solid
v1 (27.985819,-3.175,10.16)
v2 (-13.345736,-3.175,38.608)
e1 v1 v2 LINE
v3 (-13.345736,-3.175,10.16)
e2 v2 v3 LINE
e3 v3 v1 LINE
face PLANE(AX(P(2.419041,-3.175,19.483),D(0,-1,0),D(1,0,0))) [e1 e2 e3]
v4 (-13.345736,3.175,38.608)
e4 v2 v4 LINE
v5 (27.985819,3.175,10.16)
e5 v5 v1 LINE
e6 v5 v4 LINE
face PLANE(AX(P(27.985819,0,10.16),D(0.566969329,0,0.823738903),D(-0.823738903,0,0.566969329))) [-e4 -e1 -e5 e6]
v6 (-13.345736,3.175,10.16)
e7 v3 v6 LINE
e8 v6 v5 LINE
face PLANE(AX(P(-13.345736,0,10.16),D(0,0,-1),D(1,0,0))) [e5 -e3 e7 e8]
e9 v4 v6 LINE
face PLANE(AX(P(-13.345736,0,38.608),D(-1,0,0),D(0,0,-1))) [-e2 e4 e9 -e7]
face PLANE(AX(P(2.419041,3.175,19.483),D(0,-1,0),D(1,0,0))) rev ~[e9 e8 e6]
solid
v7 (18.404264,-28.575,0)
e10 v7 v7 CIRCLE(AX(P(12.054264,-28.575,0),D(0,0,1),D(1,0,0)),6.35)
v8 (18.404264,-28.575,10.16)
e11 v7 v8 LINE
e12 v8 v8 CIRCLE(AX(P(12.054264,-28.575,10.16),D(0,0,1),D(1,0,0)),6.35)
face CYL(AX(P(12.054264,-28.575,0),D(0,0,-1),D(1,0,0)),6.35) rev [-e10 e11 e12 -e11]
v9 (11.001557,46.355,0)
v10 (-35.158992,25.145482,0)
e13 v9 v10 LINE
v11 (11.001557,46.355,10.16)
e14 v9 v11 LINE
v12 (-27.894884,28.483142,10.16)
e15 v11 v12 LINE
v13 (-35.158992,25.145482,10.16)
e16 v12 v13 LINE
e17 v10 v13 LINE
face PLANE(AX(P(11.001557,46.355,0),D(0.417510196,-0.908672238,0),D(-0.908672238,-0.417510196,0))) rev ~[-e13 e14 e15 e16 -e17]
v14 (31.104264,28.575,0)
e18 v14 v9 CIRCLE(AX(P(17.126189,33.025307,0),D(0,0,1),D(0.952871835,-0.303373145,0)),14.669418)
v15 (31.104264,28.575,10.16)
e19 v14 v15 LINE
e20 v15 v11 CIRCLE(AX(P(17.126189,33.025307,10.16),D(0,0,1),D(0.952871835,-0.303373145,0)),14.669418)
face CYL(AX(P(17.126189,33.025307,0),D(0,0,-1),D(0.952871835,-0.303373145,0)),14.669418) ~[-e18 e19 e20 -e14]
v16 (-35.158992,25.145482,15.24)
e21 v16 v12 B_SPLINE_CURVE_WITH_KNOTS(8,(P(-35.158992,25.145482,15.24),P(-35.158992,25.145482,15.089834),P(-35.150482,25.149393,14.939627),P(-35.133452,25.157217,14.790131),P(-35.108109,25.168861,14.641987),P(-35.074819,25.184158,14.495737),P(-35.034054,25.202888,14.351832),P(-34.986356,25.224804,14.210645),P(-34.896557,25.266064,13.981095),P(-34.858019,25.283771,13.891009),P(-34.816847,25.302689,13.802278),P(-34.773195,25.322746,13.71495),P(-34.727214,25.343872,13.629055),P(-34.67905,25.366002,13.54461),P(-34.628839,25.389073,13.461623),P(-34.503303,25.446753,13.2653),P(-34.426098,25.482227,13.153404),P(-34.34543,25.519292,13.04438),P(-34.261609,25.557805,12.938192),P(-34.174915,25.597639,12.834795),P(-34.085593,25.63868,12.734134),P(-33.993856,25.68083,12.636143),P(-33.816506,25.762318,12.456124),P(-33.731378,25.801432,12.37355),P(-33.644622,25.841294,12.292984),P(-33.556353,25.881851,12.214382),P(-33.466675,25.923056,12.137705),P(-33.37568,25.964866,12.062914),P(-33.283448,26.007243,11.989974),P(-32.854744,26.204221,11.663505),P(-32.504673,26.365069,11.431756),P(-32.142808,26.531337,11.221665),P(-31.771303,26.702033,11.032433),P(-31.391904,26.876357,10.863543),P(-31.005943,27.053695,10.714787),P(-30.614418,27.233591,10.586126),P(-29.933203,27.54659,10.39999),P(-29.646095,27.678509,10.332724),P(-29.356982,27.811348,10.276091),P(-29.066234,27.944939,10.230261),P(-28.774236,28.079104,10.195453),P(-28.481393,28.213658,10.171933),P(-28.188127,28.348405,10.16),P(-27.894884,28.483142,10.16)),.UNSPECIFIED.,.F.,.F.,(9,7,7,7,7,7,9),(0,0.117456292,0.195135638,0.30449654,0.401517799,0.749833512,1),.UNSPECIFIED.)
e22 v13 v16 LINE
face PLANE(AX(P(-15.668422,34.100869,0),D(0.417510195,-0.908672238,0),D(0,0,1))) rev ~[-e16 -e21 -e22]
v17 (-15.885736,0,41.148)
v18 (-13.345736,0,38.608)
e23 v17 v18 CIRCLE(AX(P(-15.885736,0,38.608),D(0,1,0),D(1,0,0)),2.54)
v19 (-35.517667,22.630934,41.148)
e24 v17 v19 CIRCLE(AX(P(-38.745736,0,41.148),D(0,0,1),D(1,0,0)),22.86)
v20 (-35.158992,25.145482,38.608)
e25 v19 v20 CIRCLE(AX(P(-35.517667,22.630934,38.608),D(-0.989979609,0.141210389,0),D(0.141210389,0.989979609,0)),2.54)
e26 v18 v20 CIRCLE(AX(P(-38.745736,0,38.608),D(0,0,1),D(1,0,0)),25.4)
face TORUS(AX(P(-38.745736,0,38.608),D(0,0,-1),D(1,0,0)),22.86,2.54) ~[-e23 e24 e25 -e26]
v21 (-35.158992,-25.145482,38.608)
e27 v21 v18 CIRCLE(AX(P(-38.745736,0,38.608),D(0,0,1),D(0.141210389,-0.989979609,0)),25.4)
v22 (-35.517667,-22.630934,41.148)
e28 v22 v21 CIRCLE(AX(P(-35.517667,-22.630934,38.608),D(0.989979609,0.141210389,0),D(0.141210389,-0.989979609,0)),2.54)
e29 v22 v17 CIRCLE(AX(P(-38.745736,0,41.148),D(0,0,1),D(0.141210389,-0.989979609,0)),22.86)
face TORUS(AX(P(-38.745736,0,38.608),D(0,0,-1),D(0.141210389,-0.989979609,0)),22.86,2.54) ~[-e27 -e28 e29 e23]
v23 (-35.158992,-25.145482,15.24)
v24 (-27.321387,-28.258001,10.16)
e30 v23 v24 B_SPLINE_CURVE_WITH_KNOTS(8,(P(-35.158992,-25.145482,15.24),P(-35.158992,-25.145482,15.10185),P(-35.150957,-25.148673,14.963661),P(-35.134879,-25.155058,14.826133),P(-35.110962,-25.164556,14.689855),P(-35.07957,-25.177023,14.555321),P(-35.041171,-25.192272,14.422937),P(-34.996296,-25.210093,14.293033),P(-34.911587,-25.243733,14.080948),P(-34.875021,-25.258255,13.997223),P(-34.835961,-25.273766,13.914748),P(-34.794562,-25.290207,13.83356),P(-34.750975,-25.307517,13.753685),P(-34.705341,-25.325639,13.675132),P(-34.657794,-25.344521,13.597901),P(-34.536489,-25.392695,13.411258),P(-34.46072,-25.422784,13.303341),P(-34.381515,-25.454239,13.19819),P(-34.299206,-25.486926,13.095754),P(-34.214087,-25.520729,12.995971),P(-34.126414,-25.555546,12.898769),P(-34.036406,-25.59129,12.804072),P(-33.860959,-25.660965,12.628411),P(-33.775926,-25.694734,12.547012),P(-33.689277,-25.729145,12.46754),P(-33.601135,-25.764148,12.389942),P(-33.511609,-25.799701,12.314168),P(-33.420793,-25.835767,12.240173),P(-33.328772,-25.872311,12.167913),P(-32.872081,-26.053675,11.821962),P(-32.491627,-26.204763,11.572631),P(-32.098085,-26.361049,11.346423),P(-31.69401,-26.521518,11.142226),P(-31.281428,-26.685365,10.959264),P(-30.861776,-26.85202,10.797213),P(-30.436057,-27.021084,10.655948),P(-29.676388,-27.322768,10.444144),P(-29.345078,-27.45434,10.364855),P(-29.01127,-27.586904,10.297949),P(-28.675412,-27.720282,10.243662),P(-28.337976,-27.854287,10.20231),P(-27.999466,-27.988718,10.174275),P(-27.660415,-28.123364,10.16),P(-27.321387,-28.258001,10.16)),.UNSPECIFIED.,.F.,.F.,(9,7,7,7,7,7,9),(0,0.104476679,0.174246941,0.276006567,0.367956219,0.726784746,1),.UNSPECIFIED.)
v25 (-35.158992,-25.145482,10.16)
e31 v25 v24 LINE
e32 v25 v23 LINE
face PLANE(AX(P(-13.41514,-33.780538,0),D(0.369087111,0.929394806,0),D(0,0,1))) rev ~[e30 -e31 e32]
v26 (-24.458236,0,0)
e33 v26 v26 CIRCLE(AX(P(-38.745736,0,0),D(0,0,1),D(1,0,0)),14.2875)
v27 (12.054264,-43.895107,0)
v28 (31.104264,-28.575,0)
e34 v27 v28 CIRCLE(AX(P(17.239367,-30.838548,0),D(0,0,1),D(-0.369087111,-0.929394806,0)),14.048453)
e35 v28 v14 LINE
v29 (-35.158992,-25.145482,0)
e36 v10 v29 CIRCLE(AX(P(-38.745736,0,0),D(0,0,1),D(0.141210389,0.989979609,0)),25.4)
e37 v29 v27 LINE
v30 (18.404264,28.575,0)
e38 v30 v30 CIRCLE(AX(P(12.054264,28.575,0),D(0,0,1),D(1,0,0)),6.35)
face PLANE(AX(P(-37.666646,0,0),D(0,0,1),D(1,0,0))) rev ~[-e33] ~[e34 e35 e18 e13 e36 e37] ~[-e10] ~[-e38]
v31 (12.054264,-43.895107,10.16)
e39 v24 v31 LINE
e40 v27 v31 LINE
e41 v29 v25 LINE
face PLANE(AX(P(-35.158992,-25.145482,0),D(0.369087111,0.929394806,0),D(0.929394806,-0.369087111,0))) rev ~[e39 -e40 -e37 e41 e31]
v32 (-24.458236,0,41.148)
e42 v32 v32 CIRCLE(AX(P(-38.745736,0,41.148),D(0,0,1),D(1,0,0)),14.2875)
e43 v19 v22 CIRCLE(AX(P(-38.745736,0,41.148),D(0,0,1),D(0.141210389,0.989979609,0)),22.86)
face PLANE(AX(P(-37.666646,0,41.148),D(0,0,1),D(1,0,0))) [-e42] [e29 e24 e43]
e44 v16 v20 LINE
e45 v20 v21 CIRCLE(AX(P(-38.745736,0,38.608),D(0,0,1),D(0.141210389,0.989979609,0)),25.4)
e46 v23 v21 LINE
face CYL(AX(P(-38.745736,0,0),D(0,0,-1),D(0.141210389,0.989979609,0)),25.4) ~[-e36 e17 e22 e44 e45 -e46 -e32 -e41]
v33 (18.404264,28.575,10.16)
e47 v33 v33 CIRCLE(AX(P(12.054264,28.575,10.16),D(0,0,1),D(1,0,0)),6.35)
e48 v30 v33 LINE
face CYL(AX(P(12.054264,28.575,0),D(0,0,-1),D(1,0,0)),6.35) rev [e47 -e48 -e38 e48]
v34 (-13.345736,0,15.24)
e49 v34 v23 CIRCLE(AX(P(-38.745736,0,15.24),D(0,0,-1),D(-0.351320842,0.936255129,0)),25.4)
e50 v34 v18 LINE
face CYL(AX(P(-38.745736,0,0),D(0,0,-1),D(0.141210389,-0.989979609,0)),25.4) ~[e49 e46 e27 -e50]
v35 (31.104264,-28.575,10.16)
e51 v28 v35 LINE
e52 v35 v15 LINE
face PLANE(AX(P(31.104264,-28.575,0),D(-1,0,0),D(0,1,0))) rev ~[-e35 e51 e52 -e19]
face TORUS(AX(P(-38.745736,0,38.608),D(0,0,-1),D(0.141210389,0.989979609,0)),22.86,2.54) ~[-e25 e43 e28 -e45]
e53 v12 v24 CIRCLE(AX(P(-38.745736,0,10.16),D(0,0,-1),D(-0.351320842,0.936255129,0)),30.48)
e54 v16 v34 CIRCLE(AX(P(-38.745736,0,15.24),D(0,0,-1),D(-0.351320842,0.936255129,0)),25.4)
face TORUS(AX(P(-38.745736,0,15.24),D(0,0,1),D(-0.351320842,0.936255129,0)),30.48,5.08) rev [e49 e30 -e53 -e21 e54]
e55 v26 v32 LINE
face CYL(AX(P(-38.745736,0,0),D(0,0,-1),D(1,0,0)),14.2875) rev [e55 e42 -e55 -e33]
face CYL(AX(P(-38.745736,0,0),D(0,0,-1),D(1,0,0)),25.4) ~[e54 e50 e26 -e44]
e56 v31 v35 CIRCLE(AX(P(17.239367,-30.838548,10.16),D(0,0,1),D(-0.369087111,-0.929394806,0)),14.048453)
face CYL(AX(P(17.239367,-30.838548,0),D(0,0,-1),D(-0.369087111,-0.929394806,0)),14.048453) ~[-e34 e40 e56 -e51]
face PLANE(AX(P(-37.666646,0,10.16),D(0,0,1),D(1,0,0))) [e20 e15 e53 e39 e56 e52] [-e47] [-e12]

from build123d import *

# Parameters (mm, degrees)
F0_R          = 14.2875
F2_DEPTH      = 41.148
F0_R_2        = 6.35
F3_DEPTH      = 10.16
F4_R          = 2.54
F6_DEPTH      = 3.175
F6_DEPTH_BACK = 3.175
F7_T4_ANGLE   = 221.1362500102


# Not quite as in the source:
# - a fillet or chamfer that OpenCascade refuses, or shapes differently, is made with other operations: its cross-section is extruded or revolved along the edge and cut away or added


with BuildPart() as f2:
    # F0 (on Top) → F2 (new body)
    with BuildSketch(Plane.XY):
        with BuildLine():
            ThreePointArc((-35.158992291, -25.1454820671), (-19.5589790857, -16.6441687329), (-13.3457361643, 0))
            ThreePointArc((-13.3457361643, 0), (-19.5589790857, 16.6441687329), (-35.158992291, 25.1454820671))
            ThreePointArc((-35.158992291, 25.1454820671), (-64.1457361643, 0), (-35.158992291, -25.1454820671))
        make_face()
        with Locations((-38.7457361643, 0)):
            Circle(F0_R, mode=Mode.SUBTRACT)
    extrude(amount=F2_DEPTH)

    # F0 (on Top) → F3 (join)
    with BuildSketch(Plane.XY):
        with BuildLine():
            ThreePointArc((-35.158992291, -25.1454820671), (-19.5589790857, -16.6441687329), (-13.3457361643, 0))
            ThreePointArc((-13.3457361643, 0), (-19.5589790857, 16.6441687329), (-35.158992291, 25.1454820671))
            ThreePointArc((-35.158992291, 25.1454820671), (-64.1457361643, 0), (-35.158992291, -25.1454820671))
        make_face()
        with Locations((-38.7457361643, 0)):
            Circle(F0_R, mode=Mode.SUBTRACT)
        with BuildLine():
            ThreePointArc((-35.158992291, 25.1454820671), (-19.5589790857, 16.6441687329), (-13.3457361643, 0))
            ThreePointArc((-13.3457361643, 0), (-19.5589790857, -16.6441687329), (-35.158992291, -25.1454820671))
            Line((-35.158992291, -25.1454820671), (12.0542638357, -43.8951072877))
            ThreePointArc((12.0542638357, -43.8951072877), (26.0434071743, -41.786054626), (31.1042638357, -28.575))
            Line((31.1042638357, -28.575), (31.1042638357, 28.575))
            ThreePointArc((31.1042638357, 28.575), (26.8447918404, 44.0135088699), (11.0015574139, 46.355))
            Line((11.0015574139, 46.355), (-35.158992291, 25.1454820671))
        make_face()
        with Locations((12.0542638357, -28.575)):
            Circle(F0_R_2, mode=Mode.SUBTRACT)
        with Locations((12.0542638357, 28.575)):
            Circle(F0_R_2, mode=Mode.SUBTRACT)
    extrude(amount=F3_DEPTH)

    # F4
    f4_edges = [f2.edges().sort_by_distance(p)[0] for p in [
        (-42.33248, 25.145482, 41.148),
    ]]
    fillet(f4_edges, radius=F4_R)

    # F7: fillet of radius 5.08 on 1 edges, made by hand


with BuildPart() as f6:
    # F5 (on Front) → F6 (new body, two sides)
    with BuildSketch(Plane.XZ) as f6_sk:
        Polygon((-13.3457361643, 10.16), (11.0015574139, 10.16), (12.0542638357, 10.16), (27.9858194052, 10.16), (-13.3457361643, 38.608), align=None)
    extrude(amount=F6_DEPTH)
    extrude(f6_sk.sketch, amount=-F6_DEPTH_BACK)


with BuildPart() as f7_tool2:
    # F7_s3 → F7_t4 (revolve)
    with BuildSketch(Plane(origin=(-33.9634919914, -12.7444776929, 0), x_dir=(0, 0, 1), z_dir=(-0.9362551287, -0.351320842, 0))):
        with BuildLine():
            ThreePointArc((15.24, 39.0121846518), (11.6478975516, 40.5000822033), (10.16, 44.0921846518))
            Line((10.16, 44.0921846518), (10.16, 39.0121846518))
            Line((10.16, 39.0121846518), (15.24, 39.0121846518))
        make_face()
    revolve(axis=Axis((-38.7457361643, 0, 10.16), (0, 0, -1)), revolution_arc=F7_T4_ANGLE)

    split(bisect_by=Plane(origin=(-15.6684224941, 34.1008691297, 0), x_dir=(0, 0, 1), z_dir=(0.4175101955, -0.9086722383, 0)), keep=Keep.TOP)

    split(bisect_by=Plane(origin=(-13.4151395624, -33.7805376205, 0), x_dir=(0, 0, 1), z_dir=(0.3690871106, 0.9293948056, 0)), keep=Keep.TOP)


with BuildPart() as f2_1:
    add(f2.part)

    # F7_t1: union F7_tool2
    add(f7_tool2.part)


solid = Compound([f6.part, f2_1.part])
